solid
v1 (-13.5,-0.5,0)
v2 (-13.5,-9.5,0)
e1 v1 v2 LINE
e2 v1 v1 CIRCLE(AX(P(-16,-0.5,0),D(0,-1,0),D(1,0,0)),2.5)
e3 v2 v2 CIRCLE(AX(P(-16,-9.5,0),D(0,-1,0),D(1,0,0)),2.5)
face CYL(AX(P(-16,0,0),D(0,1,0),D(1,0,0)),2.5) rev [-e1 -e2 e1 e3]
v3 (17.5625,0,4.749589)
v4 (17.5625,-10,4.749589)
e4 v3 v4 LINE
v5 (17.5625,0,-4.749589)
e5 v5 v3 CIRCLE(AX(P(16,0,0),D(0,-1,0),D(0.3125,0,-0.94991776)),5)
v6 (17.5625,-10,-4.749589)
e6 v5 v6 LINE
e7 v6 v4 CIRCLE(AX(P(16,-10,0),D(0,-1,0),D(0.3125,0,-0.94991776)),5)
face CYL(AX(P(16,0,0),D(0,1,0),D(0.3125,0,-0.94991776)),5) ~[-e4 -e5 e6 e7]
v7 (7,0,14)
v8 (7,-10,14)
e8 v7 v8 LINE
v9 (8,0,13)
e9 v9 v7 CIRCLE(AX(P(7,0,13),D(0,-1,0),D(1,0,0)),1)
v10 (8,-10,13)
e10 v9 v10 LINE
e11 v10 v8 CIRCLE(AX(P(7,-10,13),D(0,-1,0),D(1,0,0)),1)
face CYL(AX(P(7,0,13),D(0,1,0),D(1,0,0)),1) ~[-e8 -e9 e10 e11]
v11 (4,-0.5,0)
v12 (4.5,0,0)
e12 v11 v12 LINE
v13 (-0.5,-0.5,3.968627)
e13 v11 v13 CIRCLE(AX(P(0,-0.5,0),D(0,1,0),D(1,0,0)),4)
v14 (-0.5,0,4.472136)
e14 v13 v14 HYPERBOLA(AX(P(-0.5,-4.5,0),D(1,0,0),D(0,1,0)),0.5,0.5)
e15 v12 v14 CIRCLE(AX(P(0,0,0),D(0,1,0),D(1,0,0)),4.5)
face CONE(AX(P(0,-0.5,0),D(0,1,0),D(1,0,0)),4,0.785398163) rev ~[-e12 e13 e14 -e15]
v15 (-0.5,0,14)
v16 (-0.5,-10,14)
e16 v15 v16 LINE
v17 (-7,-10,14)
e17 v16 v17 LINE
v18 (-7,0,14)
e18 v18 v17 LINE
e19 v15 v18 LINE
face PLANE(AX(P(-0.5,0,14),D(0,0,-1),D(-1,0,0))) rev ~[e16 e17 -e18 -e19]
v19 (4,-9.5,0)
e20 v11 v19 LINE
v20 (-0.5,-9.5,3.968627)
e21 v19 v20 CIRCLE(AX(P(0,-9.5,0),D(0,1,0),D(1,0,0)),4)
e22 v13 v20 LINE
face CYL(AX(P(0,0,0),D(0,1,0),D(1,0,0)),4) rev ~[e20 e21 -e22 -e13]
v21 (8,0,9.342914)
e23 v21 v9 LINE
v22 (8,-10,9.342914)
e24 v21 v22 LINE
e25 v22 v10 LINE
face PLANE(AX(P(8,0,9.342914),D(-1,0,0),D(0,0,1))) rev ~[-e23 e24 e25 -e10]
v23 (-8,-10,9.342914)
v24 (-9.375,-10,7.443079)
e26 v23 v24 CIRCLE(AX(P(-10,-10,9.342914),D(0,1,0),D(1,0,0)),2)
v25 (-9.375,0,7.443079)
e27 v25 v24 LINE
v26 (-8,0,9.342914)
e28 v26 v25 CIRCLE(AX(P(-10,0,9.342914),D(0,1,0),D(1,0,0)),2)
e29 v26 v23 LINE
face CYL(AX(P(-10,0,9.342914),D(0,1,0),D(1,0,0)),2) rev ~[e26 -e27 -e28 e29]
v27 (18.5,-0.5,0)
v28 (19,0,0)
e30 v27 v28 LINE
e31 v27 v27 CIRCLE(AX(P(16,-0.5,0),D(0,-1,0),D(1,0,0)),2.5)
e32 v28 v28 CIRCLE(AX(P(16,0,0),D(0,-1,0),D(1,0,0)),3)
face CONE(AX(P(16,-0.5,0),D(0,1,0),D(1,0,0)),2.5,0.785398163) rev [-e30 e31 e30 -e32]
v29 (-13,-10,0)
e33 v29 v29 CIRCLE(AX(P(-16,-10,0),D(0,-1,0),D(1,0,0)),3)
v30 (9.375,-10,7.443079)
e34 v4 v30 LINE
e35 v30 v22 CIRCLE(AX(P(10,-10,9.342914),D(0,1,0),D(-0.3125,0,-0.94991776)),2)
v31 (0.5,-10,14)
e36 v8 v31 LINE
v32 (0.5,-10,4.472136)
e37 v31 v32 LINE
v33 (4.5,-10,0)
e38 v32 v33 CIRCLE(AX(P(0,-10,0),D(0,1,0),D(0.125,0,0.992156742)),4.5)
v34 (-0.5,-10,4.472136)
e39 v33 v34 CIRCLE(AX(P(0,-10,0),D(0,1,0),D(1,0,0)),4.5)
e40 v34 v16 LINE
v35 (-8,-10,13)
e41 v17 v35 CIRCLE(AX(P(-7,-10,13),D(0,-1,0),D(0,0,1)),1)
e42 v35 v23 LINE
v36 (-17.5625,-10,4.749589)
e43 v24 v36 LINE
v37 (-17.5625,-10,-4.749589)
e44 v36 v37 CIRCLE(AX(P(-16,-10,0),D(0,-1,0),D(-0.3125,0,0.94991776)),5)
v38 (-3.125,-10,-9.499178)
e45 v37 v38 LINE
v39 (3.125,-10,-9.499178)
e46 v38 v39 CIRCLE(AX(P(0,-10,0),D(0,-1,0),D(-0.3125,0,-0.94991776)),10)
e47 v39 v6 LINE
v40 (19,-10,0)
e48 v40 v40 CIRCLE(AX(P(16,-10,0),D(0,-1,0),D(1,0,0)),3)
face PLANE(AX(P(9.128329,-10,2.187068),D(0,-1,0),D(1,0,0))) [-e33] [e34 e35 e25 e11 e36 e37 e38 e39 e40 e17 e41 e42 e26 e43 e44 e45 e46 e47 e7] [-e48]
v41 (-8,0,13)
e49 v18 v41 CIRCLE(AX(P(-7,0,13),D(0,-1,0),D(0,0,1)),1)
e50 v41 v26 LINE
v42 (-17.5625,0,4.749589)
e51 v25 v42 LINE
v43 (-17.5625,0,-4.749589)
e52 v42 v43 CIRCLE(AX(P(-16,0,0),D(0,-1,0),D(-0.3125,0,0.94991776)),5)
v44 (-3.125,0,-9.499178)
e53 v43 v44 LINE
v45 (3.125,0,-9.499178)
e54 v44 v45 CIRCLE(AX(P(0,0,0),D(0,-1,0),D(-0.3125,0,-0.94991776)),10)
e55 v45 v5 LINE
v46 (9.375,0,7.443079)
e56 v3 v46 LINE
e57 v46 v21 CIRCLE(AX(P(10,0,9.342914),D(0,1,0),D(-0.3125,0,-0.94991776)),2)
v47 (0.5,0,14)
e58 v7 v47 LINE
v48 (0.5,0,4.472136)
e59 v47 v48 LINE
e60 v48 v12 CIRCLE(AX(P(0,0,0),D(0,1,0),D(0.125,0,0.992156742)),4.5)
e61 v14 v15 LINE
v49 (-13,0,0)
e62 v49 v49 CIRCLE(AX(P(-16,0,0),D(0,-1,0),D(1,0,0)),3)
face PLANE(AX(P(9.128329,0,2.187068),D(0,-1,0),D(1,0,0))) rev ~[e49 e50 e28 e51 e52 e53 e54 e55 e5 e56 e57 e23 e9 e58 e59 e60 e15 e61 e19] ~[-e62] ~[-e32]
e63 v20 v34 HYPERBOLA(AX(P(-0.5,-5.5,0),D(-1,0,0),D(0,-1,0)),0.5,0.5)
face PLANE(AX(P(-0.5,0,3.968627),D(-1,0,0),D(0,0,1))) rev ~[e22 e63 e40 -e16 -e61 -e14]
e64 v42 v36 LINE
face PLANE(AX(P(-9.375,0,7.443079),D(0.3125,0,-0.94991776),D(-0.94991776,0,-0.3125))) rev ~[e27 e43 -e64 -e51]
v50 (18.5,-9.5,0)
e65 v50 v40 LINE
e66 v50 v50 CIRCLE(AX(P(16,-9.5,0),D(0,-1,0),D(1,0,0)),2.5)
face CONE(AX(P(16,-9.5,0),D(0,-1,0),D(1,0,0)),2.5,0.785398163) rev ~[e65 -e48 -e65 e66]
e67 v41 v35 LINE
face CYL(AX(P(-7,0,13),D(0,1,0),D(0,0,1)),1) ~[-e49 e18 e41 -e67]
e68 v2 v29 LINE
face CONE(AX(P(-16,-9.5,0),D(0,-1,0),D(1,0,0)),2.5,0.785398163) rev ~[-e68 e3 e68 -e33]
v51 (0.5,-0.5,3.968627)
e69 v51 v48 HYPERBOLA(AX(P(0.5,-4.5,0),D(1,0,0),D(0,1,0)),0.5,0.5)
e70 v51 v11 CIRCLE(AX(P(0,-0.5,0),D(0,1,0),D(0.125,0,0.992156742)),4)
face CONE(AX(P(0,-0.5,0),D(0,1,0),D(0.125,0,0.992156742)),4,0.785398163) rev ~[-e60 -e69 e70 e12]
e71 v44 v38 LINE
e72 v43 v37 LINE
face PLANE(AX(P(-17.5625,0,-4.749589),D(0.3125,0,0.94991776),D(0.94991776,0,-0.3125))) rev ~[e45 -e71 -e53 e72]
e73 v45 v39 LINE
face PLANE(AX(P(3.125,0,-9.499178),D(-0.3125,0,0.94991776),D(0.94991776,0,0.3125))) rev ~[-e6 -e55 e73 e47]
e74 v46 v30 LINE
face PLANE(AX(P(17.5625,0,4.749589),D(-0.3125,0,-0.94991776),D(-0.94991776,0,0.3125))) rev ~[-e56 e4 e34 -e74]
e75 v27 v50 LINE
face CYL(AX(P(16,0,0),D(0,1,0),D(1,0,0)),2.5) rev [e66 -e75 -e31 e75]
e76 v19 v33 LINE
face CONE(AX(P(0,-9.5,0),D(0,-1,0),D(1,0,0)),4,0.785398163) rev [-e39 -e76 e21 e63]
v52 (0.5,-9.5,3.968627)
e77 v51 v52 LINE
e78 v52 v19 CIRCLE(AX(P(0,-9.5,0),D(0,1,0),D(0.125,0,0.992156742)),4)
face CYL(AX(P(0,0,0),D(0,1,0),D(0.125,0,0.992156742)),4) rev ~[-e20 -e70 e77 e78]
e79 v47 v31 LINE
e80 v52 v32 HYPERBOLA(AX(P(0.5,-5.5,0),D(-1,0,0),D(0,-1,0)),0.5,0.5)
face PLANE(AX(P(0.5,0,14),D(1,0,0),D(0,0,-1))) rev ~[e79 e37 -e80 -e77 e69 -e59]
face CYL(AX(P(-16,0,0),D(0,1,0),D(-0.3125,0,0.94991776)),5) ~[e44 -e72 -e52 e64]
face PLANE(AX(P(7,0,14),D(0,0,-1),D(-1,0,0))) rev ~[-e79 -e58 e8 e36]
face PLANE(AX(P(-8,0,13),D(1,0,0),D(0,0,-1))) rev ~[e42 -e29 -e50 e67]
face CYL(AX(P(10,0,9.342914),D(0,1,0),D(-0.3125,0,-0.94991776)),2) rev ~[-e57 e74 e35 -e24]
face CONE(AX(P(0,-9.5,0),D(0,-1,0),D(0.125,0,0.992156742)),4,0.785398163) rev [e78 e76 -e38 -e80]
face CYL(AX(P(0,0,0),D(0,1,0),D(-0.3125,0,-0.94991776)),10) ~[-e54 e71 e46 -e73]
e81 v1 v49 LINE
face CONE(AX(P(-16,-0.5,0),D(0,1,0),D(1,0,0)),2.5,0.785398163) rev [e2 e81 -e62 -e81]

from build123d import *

# Parameters (mm, degrees)
F0_R     = 2.5
F1_DEPTH = 10
F2_SIZE  = 0.5


# Not quite as in the source:
# - a feature names something its author has since deleted; it is built from what else it names


with BuildPart() as f1:
    # F0 (on Front) → F1 (new body)
    with BuildSketch(Plane.XZ):
        with BuildLine():
            Line((0.5, 14), (0.5, 9.9874921777))
            ThreePointArc((0.5, 9.9874921777), (7.2456883731, 6.892024376), (10, 0))
            ThreePointArc((10, 0), (8.100925873, -5.8630196998), (3.125, -9.499177596))
            Line((3.125, -9.499177596), (17.5625, -4.749588798))
            ThreePointArc((17.5625, -4.749588798), (11, 0), (17.5625, 4.749588798))
            Line((17.5625, 4.749588798), (9.375, 7.4430785492))
            ThreePointArc((9.375, 7.4430785492), (8.3798148254, 8.1703101285), (8, 9.3429140684))
            Line((8, 9.3429140684), (8, 13))
            ThreePointArc((8, 13), (7.7071067812, 13.7071067812), (7, 14))
            Line((7, 14), (0.5, 14))
        make_face()
        with BuildLine():
            ThreePointArc((17.5625, 4.749588798), (11, 0), (17.5625, -4.749588798))
            ThreePointArc((17.5625, -4.749588798), (20.0504629365, -2.9315098499), (21, 0))
            ThreePointArc((21, 0), (20.0504629365, 2.9315098499), (17.5625, 4.749588798))
        make_face()
        with Locations((16, 0)):
            Circle(F0_R, mode=Mode.SUBTRACT)
        with BuildLine():
            ThreePointArc((-3.125, -9.499177596), (-9.9104859097, 1.3350164915), (-0.5, 9.9874921777))
            Line((-0.5, 9.9874921777), (-0.5, 14))
            Line((-0.5, 14), (-7, 14))
            ThreePointArc((-7, 14), (-7.7071067812, 13.7071067812), (-8, 13))
            Line((-8, 13), (-8, 9.3429140684))
            ThreePointArc((-8, 9.3429140684), (-8.3798148254, 8.1703101285), (-9.375, 7.4430785492))
            Line((-9.375, 7.4430785492), (-17.5625, 4.749588798))
            ThreePointArc((-17.5625, 4.749588798), (-13.0684901501, 4.0504629365), (-11, 0))
            ThreePointArc((-11, 0), (-13.0684901501, -4.0504629365), (-17.5625, -4.749588798))
            Line((-17.5625, -4.749588798), (-3.125, -9.499177596))
        make_face()
        with BuildLine():
            ThreePointArc((-17.5625, 4.749588798), (-21, 0), (-17.5625, -4.749588798))
            ThreePointArc((-17.5625, -4.749588798), (-13.0684901501, -4.0504629365), (-11, 0))
            ThreePointArc((-11, 0), (-13.0684901501, 4.0504629365), (-17.5625, 4.749588798))
        make_face()
        with Locations((-16, 0)):
            Circle(F0_R, mode=Mode.SUBTRACT)
        with BuildLine():
            ThreePointArc((0.5, 3.9686269666), (3, 2.6457513111), (4, 0))
            ThreePointArc((4, 0), (-2.6457513111, -3), (-0.5, 3.9686269666))
            Line((-0.5, 3.9686269666), (-0.5, 9.9874921777))
            ThreePointArc((-0.5, 9.9874921777), (-9.9104859097, 1.3350164915), (-3.125, -9.499177596))
            ThreePointArc((-3.125, -9.499177596), (0, -10), (3.125, -9.499177596))
            ThreePointArc((3.125, -9.499177596), (8.100925873, -5.8630196998), (10, 0))
            ThreePointArc((10, 0), (7.2456883731, 6.892024376), (0.5, 9.9874921777))
            Line((0.5, 9.9874921777), (0.5, 3.9686269666))
        make_face()
    extrude(amount=F1_DEPTH)

    # F2
    f2_edges = [f1.edges().sort_by_distance(p)[0] for p in [
        (-18.5, -10, 0),
        (0, -10, -4),
        (13.5, -10, 0),
        (13.5, 0, 0),
        (0, 0, -4),
        (-18.5, 0, 0),
    ]]
    chamfer(f2_edges, length=F2_SIZE)


solid = f1.part
